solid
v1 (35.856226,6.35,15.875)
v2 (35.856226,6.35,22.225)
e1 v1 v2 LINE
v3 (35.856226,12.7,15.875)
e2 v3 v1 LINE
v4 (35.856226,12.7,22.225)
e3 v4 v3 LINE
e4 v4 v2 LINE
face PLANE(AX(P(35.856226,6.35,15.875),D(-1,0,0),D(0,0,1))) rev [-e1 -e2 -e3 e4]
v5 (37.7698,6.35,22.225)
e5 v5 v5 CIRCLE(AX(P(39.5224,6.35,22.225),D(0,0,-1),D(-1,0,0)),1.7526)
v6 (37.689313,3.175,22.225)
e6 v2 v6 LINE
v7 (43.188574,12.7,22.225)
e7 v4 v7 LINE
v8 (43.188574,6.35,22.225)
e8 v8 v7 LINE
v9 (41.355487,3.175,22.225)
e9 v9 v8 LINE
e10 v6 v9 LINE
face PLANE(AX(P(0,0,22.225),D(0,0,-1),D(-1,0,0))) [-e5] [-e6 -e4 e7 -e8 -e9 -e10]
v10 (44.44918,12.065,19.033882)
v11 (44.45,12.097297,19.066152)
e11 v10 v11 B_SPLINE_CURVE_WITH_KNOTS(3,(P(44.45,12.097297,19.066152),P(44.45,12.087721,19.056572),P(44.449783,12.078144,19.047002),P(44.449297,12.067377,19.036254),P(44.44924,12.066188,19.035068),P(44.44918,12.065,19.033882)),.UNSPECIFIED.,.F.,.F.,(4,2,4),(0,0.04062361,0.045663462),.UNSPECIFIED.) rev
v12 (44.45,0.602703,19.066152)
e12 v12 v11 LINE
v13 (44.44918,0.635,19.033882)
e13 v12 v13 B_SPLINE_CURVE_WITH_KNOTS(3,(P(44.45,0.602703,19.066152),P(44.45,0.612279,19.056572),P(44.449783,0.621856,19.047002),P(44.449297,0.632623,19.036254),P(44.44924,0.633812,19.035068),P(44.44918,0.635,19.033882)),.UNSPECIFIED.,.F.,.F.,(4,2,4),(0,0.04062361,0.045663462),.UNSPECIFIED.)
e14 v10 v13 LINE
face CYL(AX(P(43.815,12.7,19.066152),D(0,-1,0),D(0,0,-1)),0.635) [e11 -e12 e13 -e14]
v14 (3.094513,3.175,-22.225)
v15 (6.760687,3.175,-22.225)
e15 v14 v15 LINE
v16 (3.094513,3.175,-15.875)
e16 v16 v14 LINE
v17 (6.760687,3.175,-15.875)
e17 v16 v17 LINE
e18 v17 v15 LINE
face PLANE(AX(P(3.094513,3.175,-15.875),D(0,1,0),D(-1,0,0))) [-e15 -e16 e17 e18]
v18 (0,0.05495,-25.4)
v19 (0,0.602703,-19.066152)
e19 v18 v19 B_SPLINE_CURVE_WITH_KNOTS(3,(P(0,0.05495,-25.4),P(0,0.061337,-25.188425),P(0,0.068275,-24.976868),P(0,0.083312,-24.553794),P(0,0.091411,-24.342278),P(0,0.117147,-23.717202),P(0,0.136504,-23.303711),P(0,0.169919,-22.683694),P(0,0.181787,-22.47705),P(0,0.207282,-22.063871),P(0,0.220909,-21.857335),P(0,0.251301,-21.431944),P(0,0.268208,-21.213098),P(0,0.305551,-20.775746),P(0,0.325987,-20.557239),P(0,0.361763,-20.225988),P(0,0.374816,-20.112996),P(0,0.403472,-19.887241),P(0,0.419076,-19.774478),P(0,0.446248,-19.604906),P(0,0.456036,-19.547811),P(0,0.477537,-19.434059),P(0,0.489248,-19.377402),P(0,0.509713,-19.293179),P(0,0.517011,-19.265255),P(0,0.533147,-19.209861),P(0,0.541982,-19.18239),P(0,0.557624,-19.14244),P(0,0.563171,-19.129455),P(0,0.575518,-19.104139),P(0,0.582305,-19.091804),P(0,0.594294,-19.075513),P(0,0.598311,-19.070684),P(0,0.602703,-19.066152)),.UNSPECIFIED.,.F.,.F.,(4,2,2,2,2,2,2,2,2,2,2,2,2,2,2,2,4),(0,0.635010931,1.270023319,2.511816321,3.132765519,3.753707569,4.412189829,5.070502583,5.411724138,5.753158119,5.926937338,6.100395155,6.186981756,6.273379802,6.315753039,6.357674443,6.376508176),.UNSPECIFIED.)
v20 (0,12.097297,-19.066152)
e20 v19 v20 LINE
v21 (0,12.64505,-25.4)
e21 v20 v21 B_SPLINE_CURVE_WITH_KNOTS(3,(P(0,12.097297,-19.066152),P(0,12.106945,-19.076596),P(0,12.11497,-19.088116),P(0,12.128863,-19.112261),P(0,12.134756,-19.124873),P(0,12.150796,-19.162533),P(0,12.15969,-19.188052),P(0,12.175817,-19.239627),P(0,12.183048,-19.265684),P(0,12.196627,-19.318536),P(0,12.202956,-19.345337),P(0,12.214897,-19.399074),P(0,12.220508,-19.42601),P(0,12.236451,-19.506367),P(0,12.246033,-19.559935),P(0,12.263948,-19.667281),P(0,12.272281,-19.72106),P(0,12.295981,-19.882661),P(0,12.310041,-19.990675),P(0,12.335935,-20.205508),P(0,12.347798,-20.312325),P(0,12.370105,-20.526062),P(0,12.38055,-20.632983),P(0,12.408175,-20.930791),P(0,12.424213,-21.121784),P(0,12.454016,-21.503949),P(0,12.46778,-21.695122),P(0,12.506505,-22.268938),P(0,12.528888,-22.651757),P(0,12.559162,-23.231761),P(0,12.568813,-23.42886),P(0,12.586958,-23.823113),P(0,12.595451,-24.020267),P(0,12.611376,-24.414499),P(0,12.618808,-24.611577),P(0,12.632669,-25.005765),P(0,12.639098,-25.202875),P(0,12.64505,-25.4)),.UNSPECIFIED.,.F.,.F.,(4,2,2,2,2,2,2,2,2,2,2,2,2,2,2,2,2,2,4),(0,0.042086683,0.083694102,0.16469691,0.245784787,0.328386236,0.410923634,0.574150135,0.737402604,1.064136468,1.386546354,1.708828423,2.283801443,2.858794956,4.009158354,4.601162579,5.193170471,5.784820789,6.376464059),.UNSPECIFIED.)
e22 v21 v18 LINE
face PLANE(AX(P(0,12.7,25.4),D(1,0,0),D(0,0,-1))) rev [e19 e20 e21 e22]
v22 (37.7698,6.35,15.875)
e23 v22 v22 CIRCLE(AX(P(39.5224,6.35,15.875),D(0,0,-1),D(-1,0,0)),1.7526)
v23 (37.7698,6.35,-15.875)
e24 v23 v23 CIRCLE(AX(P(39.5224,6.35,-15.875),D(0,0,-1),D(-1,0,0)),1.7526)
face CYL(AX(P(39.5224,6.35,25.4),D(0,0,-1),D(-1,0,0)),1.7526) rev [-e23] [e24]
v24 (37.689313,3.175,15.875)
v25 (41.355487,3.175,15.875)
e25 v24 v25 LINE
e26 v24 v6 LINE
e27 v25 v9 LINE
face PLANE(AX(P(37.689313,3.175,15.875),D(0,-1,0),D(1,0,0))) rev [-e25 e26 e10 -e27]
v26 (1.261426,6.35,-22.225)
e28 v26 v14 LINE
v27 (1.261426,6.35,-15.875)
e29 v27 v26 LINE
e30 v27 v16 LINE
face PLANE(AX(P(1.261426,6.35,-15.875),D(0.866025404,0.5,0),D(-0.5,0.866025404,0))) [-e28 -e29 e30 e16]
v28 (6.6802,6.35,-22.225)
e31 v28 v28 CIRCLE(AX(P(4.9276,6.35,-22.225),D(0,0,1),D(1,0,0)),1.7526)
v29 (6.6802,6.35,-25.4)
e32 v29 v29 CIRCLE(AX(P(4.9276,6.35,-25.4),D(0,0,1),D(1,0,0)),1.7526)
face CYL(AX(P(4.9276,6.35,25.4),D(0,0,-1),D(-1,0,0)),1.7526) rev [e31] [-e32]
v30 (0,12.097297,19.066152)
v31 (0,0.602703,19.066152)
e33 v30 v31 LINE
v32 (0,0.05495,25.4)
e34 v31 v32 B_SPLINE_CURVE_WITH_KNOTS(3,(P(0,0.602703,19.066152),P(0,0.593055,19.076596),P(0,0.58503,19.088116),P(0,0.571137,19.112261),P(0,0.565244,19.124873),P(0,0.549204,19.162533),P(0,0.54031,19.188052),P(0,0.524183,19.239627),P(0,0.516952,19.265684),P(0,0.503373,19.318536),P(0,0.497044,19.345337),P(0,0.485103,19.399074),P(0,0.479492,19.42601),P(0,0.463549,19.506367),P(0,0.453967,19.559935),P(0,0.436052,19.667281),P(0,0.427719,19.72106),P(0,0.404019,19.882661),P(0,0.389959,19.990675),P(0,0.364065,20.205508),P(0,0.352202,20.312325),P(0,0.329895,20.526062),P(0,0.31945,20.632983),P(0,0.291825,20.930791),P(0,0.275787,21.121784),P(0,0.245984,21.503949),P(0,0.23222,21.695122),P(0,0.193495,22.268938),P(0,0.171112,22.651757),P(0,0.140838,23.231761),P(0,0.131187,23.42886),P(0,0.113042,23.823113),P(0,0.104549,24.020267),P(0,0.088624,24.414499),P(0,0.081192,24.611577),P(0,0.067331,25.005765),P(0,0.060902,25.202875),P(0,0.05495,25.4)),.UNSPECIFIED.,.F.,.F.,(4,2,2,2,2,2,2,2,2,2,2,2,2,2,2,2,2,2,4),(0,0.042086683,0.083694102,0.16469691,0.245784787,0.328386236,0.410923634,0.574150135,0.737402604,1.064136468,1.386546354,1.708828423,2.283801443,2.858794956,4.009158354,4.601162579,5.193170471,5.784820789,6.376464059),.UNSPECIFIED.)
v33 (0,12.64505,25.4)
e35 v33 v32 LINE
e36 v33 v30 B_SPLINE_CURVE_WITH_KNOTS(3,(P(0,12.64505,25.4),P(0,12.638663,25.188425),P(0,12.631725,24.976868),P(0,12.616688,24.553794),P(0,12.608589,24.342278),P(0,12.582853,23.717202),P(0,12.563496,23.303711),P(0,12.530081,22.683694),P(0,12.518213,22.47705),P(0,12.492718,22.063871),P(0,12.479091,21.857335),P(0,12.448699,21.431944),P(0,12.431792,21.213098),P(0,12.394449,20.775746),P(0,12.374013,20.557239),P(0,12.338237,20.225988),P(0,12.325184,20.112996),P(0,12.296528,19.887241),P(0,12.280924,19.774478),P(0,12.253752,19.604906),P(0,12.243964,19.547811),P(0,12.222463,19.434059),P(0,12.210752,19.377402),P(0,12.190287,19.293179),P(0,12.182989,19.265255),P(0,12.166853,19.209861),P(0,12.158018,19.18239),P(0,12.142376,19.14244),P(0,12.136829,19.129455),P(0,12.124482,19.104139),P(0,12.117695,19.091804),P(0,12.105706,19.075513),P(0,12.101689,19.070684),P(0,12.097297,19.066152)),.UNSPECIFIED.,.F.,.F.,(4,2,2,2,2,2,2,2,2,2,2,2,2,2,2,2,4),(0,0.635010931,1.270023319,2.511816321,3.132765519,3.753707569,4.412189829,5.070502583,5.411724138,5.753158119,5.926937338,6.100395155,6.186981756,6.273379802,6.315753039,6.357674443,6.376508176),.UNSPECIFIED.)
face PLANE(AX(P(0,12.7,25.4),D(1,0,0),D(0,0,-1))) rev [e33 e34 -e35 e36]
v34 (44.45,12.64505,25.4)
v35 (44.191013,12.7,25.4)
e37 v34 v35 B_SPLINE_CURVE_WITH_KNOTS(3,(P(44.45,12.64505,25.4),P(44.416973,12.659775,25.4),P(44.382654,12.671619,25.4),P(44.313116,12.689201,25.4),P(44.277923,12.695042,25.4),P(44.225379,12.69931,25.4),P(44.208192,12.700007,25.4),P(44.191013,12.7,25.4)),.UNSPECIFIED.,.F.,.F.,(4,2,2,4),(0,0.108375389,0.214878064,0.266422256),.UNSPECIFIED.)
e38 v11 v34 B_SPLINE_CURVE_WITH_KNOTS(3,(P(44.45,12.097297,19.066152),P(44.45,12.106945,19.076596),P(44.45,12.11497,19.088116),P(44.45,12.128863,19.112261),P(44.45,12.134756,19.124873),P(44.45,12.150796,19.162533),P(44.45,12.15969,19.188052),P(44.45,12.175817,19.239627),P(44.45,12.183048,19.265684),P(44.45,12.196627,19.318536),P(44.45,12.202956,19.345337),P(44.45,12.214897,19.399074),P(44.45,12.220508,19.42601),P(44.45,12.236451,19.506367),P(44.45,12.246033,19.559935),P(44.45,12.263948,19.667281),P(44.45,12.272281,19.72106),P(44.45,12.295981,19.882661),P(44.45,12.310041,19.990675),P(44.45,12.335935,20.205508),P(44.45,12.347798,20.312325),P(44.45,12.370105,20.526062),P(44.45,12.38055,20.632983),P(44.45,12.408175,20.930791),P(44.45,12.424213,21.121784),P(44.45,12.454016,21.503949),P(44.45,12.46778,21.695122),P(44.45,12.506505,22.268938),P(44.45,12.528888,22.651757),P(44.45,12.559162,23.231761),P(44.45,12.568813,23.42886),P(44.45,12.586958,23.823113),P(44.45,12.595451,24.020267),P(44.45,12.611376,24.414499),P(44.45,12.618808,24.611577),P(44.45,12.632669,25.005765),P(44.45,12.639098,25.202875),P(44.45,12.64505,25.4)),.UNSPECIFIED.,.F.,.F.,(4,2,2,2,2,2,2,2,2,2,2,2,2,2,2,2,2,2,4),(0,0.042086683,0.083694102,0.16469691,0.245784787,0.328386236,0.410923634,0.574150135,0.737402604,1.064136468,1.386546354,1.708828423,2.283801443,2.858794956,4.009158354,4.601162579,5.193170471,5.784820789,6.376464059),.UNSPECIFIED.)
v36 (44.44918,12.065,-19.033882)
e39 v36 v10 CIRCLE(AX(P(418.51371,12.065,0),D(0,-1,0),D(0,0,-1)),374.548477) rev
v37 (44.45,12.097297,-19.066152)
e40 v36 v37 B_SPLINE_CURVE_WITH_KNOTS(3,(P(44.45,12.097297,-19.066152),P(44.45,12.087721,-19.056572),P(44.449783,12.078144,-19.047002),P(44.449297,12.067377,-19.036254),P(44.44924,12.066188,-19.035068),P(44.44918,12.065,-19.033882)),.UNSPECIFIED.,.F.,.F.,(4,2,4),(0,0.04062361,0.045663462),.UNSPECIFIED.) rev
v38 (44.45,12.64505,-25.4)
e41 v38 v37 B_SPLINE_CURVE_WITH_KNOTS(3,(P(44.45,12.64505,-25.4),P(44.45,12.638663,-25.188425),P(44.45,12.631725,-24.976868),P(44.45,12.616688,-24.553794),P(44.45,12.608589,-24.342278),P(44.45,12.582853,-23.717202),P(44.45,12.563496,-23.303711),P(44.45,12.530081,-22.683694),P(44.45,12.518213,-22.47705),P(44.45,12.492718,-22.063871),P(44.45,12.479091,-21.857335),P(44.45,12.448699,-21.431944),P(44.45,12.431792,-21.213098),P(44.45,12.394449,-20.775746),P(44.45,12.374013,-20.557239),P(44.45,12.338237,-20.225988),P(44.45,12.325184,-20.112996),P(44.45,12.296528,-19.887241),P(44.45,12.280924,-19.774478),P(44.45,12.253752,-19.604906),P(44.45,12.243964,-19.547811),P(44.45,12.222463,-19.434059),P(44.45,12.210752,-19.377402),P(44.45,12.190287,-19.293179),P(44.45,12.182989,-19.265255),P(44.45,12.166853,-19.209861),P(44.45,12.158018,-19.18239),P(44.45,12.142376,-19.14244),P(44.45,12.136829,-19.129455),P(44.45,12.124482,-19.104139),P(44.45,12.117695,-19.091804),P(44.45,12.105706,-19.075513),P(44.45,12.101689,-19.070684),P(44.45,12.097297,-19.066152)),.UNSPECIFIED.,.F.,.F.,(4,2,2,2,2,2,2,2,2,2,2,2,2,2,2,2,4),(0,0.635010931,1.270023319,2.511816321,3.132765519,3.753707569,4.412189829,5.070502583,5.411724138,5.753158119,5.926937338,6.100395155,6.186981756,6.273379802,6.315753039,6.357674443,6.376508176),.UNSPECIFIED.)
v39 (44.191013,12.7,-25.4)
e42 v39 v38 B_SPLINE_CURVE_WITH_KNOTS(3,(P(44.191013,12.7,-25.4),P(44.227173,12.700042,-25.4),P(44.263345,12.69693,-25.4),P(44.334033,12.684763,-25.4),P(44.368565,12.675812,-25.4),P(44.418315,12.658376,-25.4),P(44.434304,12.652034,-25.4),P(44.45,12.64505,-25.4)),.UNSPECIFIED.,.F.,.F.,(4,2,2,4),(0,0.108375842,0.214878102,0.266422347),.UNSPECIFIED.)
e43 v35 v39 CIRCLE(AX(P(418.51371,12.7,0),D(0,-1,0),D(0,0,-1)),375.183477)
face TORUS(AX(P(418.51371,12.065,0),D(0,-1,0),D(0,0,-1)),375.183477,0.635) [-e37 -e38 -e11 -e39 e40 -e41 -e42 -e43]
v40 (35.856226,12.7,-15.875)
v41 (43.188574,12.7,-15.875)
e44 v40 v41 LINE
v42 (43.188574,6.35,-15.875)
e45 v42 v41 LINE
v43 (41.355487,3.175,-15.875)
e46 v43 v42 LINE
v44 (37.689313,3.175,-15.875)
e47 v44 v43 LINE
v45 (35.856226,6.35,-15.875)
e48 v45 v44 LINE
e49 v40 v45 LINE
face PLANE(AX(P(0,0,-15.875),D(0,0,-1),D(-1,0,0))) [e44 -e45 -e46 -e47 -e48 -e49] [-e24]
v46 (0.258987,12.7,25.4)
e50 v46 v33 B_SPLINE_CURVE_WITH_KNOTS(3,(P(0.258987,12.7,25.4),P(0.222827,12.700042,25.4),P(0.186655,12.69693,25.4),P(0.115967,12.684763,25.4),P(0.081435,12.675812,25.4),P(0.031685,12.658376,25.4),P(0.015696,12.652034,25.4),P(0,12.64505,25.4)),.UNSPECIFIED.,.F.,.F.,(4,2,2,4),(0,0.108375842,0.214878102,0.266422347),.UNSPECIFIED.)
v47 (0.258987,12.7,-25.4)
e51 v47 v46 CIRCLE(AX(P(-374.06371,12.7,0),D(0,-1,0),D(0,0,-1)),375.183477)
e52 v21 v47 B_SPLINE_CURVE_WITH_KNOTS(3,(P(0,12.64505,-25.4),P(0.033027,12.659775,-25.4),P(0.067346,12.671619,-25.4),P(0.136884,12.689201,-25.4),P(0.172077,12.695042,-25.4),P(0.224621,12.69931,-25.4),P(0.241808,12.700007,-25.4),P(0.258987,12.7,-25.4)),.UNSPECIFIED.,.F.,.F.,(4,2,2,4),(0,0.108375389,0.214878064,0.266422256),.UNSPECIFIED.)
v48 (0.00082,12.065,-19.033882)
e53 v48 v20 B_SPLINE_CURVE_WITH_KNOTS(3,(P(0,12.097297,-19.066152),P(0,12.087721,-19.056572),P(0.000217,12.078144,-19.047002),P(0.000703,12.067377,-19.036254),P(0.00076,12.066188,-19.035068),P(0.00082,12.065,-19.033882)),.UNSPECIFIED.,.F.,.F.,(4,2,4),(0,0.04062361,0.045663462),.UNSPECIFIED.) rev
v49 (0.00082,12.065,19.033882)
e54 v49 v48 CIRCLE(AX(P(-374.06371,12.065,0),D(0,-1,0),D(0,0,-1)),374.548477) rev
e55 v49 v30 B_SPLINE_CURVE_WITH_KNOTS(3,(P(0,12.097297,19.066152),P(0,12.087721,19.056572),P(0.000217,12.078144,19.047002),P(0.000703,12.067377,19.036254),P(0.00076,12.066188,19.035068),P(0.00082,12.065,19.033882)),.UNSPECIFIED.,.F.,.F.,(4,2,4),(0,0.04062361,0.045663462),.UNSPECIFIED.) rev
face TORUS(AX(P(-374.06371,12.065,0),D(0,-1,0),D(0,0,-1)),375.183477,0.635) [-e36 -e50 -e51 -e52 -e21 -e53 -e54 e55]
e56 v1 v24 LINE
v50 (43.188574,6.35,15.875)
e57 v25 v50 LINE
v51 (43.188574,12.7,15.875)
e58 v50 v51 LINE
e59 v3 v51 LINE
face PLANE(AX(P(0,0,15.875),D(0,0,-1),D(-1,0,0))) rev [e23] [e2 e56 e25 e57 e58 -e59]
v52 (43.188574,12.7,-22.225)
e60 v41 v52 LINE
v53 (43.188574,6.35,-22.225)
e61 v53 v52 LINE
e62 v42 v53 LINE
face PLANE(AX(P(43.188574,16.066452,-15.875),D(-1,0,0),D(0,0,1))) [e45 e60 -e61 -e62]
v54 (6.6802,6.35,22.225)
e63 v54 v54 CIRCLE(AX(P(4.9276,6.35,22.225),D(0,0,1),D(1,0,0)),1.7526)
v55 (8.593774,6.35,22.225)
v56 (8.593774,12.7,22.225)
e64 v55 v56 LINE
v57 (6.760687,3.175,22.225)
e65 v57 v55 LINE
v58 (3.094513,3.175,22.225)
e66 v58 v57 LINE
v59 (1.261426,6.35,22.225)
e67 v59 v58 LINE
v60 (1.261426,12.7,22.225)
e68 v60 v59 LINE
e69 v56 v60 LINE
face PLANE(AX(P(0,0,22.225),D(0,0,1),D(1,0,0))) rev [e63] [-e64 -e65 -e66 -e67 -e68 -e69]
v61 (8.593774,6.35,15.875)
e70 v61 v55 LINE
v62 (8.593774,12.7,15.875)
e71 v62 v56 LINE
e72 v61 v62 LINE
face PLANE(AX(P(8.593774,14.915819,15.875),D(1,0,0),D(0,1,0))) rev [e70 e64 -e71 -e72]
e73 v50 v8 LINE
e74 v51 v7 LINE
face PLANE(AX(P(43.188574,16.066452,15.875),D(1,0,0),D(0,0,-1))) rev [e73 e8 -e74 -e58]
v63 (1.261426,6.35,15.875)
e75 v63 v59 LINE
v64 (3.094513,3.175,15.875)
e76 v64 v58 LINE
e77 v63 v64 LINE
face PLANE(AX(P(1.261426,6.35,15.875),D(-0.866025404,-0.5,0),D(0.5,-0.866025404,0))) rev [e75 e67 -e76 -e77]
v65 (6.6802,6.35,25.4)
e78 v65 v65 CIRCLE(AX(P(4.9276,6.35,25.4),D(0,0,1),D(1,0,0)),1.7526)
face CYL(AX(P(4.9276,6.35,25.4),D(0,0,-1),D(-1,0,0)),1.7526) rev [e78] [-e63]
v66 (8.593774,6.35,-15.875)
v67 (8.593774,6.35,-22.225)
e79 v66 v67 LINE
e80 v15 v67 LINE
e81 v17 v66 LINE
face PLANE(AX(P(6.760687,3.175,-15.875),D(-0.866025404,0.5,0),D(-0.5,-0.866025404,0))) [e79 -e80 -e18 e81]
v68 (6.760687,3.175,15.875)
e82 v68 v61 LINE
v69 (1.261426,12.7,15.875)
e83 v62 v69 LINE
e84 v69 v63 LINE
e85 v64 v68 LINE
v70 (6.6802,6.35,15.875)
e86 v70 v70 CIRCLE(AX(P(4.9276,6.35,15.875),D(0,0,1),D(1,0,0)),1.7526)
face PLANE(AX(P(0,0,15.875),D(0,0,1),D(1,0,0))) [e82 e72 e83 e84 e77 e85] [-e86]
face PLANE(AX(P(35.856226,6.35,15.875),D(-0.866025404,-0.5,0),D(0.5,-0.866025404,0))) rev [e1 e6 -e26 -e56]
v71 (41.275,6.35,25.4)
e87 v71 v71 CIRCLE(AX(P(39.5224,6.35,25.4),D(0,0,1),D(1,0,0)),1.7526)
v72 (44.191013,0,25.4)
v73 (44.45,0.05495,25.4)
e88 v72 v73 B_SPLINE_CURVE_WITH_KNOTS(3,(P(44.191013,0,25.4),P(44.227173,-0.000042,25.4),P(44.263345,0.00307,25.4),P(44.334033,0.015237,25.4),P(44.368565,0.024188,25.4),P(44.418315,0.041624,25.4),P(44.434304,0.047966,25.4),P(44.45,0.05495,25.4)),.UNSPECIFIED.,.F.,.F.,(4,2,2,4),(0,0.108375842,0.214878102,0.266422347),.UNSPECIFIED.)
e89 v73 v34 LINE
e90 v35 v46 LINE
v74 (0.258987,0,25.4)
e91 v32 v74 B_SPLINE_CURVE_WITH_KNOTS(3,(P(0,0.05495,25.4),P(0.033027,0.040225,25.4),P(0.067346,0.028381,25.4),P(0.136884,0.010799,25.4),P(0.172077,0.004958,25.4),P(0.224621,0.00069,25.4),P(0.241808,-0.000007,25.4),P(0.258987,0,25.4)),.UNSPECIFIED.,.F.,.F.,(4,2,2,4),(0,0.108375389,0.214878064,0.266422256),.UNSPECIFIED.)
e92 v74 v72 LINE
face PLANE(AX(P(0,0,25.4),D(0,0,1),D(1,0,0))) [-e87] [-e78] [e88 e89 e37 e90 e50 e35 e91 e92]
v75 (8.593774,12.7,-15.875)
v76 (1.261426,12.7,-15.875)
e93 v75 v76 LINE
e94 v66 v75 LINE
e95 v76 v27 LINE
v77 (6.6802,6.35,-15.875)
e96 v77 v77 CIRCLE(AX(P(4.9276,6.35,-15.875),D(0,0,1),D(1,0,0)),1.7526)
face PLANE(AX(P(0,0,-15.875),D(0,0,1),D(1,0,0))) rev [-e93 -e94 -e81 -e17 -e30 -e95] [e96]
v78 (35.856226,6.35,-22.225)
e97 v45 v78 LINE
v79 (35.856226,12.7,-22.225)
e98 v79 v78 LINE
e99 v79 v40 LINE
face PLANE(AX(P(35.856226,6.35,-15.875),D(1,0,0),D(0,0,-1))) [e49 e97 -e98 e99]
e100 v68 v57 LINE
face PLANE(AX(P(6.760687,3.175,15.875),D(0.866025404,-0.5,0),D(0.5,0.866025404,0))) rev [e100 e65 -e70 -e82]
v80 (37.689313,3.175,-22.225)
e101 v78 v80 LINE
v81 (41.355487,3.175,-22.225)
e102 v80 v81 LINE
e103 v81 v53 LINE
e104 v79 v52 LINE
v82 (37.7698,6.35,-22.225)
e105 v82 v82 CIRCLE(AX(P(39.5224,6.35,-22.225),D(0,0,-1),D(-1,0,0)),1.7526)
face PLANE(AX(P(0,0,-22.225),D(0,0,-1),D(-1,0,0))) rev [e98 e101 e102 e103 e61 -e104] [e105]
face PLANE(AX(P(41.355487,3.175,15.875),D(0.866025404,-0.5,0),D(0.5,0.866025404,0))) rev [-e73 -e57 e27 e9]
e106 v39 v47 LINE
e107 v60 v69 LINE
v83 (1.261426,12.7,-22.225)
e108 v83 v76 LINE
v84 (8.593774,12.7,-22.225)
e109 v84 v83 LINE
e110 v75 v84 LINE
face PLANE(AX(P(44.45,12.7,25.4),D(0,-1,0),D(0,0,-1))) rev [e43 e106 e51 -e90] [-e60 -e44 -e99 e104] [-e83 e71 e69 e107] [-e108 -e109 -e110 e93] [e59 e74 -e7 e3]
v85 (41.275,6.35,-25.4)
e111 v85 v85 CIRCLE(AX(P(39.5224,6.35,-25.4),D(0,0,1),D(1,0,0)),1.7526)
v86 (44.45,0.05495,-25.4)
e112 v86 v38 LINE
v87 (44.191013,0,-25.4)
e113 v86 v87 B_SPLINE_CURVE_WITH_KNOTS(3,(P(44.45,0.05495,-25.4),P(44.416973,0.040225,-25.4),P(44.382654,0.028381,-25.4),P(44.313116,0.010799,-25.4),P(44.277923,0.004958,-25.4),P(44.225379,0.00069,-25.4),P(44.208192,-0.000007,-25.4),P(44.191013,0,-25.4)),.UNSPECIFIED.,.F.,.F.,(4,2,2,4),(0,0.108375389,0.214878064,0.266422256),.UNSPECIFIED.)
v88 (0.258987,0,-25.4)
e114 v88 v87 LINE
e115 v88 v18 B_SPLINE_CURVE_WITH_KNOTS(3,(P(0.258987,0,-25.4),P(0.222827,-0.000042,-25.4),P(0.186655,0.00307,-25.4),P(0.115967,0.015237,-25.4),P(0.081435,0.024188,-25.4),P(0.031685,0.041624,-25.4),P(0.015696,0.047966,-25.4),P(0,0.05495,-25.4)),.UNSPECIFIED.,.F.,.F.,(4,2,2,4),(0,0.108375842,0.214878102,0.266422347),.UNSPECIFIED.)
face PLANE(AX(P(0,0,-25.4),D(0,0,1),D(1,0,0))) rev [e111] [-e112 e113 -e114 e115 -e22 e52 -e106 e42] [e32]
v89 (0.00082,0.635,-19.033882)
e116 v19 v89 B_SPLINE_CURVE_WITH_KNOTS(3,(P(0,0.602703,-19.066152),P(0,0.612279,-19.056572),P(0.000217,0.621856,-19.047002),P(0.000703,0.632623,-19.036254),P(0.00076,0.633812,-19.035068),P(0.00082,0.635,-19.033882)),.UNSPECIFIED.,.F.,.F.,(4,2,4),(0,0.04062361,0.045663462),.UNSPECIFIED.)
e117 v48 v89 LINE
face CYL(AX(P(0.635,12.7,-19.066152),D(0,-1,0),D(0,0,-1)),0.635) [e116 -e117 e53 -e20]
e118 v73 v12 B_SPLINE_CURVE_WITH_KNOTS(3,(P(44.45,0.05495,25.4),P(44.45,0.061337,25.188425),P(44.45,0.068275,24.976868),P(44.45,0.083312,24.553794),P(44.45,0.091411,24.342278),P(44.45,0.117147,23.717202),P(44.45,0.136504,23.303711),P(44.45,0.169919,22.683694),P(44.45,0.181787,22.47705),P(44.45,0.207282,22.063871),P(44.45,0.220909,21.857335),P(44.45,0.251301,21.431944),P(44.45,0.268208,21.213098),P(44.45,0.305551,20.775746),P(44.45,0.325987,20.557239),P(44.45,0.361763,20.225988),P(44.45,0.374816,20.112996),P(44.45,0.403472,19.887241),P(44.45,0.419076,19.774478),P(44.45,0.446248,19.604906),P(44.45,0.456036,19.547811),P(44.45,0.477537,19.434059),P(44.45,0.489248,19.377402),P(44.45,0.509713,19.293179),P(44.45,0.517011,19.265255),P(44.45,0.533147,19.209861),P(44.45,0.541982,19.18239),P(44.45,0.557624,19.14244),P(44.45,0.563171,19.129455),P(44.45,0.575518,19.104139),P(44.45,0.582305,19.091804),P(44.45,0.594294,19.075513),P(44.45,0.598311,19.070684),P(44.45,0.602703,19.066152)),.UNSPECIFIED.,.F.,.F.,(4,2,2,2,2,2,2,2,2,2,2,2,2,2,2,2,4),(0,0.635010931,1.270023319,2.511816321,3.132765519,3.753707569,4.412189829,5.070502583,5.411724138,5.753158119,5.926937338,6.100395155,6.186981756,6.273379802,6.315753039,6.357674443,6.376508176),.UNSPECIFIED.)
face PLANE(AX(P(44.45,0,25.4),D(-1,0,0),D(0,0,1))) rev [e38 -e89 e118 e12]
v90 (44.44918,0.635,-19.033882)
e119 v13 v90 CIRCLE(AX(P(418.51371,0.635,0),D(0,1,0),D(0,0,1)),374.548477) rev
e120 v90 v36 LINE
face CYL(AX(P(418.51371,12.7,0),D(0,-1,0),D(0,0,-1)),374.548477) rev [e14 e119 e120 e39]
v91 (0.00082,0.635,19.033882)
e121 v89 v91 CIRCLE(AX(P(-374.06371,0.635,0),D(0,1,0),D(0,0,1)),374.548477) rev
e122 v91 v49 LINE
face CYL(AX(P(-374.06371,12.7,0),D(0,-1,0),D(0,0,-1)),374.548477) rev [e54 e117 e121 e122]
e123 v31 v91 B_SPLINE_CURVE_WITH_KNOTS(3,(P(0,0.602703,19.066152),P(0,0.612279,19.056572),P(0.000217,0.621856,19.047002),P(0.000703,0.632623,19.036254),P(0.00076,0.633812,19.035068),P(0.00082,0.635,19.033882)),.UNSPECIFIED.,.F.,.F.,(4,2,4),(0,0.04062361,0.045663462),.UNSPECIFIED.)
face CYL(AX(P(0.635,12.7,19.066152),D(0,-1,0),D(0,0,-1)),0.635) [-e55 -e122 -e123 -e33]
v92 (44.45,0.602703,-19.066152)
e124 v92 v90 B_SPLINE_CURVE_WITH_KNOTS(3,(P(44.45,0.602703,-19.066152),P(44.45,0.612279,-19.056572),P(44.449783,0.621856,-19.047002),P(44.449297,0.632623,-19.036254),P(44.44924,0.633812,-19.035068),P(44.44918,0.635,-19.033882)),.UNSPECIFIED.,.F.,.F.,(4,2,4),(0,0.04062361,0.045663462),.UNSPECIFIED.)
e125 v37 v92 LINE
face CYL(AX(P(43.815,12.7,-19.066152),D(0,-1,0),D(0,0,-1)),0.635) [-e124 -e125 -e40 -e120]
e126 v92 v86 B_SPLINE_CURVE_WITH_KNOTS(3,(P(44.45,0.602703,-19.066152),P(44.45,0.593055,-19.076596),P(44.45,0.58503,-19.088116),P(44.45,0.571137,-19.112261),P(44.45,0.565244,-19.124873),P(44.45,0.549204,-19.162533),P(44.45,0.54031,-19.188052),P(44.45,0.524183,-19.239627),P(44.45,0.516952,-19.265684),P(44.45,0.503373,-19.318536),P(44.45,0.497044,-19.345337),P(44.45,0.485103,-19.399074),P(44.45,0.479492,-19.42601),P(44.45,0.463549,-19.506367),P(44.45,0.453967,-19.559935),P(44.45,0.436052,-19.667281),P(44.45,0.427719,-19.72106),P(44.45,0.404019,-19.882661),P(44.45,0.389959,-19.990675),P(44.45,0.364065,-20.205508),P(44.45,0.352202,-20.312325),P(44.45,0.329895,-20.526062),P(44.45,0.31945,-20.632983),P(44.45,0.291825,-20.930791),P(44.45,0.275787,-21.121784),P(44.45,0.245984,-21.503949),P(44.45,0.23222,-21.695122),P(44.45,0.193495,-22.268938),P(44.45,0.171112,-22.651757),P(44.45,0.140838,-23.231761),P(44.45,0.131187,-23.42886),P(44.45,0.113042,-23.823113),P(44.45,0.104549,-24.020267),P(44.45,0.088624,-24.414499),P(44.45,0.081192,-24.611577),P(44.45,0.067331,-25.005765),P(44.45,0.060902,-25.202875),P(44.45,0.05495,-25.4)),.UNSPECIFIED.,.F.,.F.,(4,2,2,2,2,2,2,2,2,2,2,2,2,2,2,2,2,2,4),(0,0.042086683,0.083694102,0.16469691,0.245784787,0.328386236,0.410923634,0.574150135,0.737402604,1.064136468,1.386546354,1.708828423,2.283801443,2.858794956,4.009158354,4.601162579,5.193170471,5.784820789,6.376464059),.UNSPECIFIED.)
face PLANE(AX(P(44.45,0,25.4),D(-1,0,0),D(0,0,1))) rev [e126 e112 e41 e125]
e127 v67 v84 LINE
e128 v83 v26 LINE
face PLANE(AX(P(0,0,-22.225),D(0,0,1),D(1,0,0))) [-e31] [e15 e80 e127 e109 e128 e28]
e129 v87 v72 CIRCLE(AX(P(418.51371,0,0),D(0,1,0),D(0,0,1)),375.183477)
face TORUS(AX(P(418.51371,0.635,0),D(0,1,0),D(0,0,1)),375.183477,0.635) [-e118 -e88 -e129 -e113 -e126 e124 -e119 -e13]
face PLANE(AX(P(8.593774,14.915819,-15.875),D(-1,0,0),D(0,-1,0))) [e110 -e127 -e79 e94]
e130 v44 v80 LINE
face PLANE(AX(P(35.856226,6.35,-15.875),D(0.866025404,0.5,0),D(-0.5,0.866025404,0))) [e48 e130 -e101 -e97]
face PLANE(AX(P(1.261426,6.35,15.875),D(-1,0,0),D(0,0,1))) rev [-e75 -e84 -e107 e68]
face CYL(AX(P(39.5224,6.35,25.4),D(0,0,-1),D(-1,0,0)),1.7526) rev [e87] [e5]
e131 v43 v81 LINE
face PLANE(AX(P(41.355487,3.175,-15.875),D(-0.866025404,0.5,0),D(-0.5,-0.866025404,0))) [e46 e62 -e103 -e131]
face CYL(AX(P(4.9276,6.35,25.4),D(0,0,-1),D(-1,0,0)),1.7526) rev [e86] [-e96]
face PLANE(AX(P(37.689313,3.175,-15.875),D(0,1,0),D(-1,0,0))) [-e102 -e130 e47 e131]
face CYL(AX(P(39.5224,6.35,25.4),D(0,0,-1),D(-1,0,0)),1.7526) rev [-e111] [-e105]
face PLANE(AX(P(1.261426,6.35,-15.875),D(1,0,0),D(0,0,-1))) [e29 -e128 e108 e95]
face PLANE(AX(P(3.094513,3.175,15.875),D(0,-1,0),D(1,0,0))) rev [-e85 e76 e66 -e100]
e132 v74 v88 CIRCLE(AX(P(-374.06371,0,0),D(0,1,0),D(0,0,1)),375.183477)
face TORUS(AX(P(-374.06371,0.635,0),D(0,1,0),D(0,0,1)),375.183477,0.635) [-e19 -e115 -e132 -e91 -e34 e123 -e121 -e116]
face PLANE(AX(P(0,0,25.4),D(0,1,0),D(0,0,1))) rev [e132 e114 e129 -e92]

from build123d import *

# Parameters (mm, degrees)
SKETCH1_W           = 44.45
SKETCH1_H           = 12.7
SKETCH1_R           = 1.7526
BOSS_EXTRUDE1_DEPTH = 25.4
CUT_EXTRUDE1_START  = -3.175
CUT_EXTRUDE1_DEPTH  = 6.35
CUT_EXTRUDE2_START  = -47.625
CUT_EXTRUDE2_DEPTH  = 6.35
CUT_EXTRUDE3_DEPTH  = 53.74706153
FILLET1_ANGLE       = 7.76917
FILLET1_2_ANGLE     = 7.76917
FILLET1_3_ANGLE     = 7.76917
FILLET1_4_ANGLE     = 7.76917


with BuildPart() as part:
    # Sketch1 → Boss-Extrude1 (new, symmetric)
    with BuildSketch(Plane.XY):
        with Locations((22.225, 6.35)):
            Rectangle(SKETCH1_W, SKETCH1_H)
        with Locations((4.9276, 6.35)):
            Circle(SKETCH1_R, mode=Mode.SUBTRACT)
        with Locations((39.5224, 6.35)):
            Circle(SKETCH1_R, mode=Mode.SUBTRACT)
    extrude(amount=BOSS_EXTRUDE1_DEPTH, both=True)

    # Sketch2 → Cut-Extrude1 (cut)
    with BuildSketch(Plane.XY.offset(25.4).offset(CUT_EXTRUDE1_START)):
        Polygon((1.261425791, 6.35), (1.261425791, 14.915819411), (8.593774209, 14.915819411), (8.593774209, 6.35), (6.760687105, 3.175), (3.094512895, 3.175), align=None)
        Polygon((35.856225791, 6.35), (37.689312895, 3.175), (41.355487105, 3.175), (43.188574209, 6.35), (43.188574209, 16.066451869), (35.856225791, 16.066451869), align=None)
    extrude(amount=-CUT_EXTRUDE1_DEPTH, mode=Mode.SUBTRACT)

    # Sketch2<2> → Cut-Extrude2 (cut)
    with BuildSketch(Plane.XY.offset(25.4).offset(CUT_EXTRUDE2_START)):
        Polygon((1.261425791, 6.35), (1.261425791, 14.915819411), (8.593774209, 14.915819411), (8.593774209, 6.35), (6.760687105, 3.175), (3.094512895, 3.175), align=None)
        Polygon((35.856225791, 6.35), (37.689312895, 3.175), (41.355487105, 3.175), (43.188574209, 6.35), (43.188574209, 16.066451869), (35.856225791, 16.066451869), align=None)
    extrude(amount=CUT_EXTRUDE2_DEPTH, mode=Mode.SUBTRACT)

    # Sketch3 → Cut-Extrude3 (cut, through all)
    with BuildSketch(Plane.XZ):
        with BuildLine():
            Line((44.45, 19.05), (44.45, -19.05))
            ThreePointArc((44.45, -19.05), (43.965232978, 0), (44.45, 19.05))
        make_face()
        with BuildLine():
            Line((0, 19.05), (0, -19.05))
            ThreePointArc((0, -19.05), (0.484767022, 0), (0, 19.05))
        make_face()
    extrude(amount=-CUT_EXTRUDE3_DEPTH, mode=Mode.SUBTRACT)

    # Fillet1: read off the stored shape, not the designer's step
    # Fillet1 outline → Fillet1 (revolve, cut)
    with BuildSketch(Plane(origin=(418.513709618, 0, 0), x_dir=(-0.9977025418167154, 0, -0.0677468674734517), z_dir=(0.0677468674734517, 0, -0.9977025418167154))):
        with BuildLine():
            Line((374.54847664, 12.7), (374.54847664, 12.065))
            ThreePointArc((374.54847664, 12.065), (374.734463834, 12.514012806), (375.18347664, 12.7))
            Line((375.18347664, 12.7), (374.54847664, 12.7))
        make_face()
    revolve(axis=Axis((418.513709618, 0, 0), (0, 1, 0)), revolution_arc=FILLET1_ANGLE, mode=Mode.SUBTRACT)

    # Fillet1 2 outline → Fillet1 2 (revolve, cut)
    with BuildSketch(Plane(origin=(418.513709618, 0, 0), x_dir=(-0.9977025418167154, 0, -0.0677468674734517), z_dir=(0.0677468674734517, 0, -0.9977025418167154))):
        with BuildLine():
            ThreePointArc((375.18347664, 0), (374.734463834, 0.185987194), (374.54847664, 0.635))
            Line((374.54847664, 0.635), (374.54847664, 0))
            Line((374.54847664, 0), (375.18347664, 0))
        make_face()
    revolve(axis=Axis((418.513709618, 0, 0), (0, 1, 0)), revolution_arc=FILLET1_2_ANGLE, mode=Mode.SUBTRACT)

    # Fillet1 3 outline → Fillet1 3 (revolve, cut)
    with BuildSketch(Plane(origin=(-374.063709618, 0, 0), x_dir=(0.9977025418167152, 0, 0.06774686747345202), z_dir=(-0.06774686747345202, 0, 0.9977025418167152))):
        with BuildLine():
            Line((374.54847664, 12.7), (374.54847664, 12.065))
            ThreePointArc((374.54847664, 12.065), (374.734463834, 12.514012806), (375.18347664, 12.7))
            Line((375.18347664, 12.7), (374.54847664, 12.7))
        make_face()
    revolve(axis=Axis((-374.063709618, 0, 0), (0, 1, 0)), revolution_arc=FILLET1_3_ANGLE, mode=Mode.SUBTRACT)

    # Fillet1 4 outline → Fillet1 4 (revolve, cut)
    with BuildSketch(Plane(origin=(-374.063709618, 0, 0), x_dir=(0.9977025418167152, 0, 0.06774686747345202), z_dir=(-0.06774686747345202, 0, 0.9977025418167152))):
        with BuildLine():
            ThreePointArc((375.18347664, 0), (374.734463834, 0.185987194), (374.54847664, 0.635))
            Line((374.54847664, 0.635), (374.54847664, 0))
            Line((374.54847664, 0), (375.18347664, 0))
        make_face()
    revolve(axis=Axis((-374.063709618, 0, 0), (0, 1, 0)), revolution_arc=FILLET1_4_ANGLE, mode=Mode.SUBTRACT)


solid = part.part
